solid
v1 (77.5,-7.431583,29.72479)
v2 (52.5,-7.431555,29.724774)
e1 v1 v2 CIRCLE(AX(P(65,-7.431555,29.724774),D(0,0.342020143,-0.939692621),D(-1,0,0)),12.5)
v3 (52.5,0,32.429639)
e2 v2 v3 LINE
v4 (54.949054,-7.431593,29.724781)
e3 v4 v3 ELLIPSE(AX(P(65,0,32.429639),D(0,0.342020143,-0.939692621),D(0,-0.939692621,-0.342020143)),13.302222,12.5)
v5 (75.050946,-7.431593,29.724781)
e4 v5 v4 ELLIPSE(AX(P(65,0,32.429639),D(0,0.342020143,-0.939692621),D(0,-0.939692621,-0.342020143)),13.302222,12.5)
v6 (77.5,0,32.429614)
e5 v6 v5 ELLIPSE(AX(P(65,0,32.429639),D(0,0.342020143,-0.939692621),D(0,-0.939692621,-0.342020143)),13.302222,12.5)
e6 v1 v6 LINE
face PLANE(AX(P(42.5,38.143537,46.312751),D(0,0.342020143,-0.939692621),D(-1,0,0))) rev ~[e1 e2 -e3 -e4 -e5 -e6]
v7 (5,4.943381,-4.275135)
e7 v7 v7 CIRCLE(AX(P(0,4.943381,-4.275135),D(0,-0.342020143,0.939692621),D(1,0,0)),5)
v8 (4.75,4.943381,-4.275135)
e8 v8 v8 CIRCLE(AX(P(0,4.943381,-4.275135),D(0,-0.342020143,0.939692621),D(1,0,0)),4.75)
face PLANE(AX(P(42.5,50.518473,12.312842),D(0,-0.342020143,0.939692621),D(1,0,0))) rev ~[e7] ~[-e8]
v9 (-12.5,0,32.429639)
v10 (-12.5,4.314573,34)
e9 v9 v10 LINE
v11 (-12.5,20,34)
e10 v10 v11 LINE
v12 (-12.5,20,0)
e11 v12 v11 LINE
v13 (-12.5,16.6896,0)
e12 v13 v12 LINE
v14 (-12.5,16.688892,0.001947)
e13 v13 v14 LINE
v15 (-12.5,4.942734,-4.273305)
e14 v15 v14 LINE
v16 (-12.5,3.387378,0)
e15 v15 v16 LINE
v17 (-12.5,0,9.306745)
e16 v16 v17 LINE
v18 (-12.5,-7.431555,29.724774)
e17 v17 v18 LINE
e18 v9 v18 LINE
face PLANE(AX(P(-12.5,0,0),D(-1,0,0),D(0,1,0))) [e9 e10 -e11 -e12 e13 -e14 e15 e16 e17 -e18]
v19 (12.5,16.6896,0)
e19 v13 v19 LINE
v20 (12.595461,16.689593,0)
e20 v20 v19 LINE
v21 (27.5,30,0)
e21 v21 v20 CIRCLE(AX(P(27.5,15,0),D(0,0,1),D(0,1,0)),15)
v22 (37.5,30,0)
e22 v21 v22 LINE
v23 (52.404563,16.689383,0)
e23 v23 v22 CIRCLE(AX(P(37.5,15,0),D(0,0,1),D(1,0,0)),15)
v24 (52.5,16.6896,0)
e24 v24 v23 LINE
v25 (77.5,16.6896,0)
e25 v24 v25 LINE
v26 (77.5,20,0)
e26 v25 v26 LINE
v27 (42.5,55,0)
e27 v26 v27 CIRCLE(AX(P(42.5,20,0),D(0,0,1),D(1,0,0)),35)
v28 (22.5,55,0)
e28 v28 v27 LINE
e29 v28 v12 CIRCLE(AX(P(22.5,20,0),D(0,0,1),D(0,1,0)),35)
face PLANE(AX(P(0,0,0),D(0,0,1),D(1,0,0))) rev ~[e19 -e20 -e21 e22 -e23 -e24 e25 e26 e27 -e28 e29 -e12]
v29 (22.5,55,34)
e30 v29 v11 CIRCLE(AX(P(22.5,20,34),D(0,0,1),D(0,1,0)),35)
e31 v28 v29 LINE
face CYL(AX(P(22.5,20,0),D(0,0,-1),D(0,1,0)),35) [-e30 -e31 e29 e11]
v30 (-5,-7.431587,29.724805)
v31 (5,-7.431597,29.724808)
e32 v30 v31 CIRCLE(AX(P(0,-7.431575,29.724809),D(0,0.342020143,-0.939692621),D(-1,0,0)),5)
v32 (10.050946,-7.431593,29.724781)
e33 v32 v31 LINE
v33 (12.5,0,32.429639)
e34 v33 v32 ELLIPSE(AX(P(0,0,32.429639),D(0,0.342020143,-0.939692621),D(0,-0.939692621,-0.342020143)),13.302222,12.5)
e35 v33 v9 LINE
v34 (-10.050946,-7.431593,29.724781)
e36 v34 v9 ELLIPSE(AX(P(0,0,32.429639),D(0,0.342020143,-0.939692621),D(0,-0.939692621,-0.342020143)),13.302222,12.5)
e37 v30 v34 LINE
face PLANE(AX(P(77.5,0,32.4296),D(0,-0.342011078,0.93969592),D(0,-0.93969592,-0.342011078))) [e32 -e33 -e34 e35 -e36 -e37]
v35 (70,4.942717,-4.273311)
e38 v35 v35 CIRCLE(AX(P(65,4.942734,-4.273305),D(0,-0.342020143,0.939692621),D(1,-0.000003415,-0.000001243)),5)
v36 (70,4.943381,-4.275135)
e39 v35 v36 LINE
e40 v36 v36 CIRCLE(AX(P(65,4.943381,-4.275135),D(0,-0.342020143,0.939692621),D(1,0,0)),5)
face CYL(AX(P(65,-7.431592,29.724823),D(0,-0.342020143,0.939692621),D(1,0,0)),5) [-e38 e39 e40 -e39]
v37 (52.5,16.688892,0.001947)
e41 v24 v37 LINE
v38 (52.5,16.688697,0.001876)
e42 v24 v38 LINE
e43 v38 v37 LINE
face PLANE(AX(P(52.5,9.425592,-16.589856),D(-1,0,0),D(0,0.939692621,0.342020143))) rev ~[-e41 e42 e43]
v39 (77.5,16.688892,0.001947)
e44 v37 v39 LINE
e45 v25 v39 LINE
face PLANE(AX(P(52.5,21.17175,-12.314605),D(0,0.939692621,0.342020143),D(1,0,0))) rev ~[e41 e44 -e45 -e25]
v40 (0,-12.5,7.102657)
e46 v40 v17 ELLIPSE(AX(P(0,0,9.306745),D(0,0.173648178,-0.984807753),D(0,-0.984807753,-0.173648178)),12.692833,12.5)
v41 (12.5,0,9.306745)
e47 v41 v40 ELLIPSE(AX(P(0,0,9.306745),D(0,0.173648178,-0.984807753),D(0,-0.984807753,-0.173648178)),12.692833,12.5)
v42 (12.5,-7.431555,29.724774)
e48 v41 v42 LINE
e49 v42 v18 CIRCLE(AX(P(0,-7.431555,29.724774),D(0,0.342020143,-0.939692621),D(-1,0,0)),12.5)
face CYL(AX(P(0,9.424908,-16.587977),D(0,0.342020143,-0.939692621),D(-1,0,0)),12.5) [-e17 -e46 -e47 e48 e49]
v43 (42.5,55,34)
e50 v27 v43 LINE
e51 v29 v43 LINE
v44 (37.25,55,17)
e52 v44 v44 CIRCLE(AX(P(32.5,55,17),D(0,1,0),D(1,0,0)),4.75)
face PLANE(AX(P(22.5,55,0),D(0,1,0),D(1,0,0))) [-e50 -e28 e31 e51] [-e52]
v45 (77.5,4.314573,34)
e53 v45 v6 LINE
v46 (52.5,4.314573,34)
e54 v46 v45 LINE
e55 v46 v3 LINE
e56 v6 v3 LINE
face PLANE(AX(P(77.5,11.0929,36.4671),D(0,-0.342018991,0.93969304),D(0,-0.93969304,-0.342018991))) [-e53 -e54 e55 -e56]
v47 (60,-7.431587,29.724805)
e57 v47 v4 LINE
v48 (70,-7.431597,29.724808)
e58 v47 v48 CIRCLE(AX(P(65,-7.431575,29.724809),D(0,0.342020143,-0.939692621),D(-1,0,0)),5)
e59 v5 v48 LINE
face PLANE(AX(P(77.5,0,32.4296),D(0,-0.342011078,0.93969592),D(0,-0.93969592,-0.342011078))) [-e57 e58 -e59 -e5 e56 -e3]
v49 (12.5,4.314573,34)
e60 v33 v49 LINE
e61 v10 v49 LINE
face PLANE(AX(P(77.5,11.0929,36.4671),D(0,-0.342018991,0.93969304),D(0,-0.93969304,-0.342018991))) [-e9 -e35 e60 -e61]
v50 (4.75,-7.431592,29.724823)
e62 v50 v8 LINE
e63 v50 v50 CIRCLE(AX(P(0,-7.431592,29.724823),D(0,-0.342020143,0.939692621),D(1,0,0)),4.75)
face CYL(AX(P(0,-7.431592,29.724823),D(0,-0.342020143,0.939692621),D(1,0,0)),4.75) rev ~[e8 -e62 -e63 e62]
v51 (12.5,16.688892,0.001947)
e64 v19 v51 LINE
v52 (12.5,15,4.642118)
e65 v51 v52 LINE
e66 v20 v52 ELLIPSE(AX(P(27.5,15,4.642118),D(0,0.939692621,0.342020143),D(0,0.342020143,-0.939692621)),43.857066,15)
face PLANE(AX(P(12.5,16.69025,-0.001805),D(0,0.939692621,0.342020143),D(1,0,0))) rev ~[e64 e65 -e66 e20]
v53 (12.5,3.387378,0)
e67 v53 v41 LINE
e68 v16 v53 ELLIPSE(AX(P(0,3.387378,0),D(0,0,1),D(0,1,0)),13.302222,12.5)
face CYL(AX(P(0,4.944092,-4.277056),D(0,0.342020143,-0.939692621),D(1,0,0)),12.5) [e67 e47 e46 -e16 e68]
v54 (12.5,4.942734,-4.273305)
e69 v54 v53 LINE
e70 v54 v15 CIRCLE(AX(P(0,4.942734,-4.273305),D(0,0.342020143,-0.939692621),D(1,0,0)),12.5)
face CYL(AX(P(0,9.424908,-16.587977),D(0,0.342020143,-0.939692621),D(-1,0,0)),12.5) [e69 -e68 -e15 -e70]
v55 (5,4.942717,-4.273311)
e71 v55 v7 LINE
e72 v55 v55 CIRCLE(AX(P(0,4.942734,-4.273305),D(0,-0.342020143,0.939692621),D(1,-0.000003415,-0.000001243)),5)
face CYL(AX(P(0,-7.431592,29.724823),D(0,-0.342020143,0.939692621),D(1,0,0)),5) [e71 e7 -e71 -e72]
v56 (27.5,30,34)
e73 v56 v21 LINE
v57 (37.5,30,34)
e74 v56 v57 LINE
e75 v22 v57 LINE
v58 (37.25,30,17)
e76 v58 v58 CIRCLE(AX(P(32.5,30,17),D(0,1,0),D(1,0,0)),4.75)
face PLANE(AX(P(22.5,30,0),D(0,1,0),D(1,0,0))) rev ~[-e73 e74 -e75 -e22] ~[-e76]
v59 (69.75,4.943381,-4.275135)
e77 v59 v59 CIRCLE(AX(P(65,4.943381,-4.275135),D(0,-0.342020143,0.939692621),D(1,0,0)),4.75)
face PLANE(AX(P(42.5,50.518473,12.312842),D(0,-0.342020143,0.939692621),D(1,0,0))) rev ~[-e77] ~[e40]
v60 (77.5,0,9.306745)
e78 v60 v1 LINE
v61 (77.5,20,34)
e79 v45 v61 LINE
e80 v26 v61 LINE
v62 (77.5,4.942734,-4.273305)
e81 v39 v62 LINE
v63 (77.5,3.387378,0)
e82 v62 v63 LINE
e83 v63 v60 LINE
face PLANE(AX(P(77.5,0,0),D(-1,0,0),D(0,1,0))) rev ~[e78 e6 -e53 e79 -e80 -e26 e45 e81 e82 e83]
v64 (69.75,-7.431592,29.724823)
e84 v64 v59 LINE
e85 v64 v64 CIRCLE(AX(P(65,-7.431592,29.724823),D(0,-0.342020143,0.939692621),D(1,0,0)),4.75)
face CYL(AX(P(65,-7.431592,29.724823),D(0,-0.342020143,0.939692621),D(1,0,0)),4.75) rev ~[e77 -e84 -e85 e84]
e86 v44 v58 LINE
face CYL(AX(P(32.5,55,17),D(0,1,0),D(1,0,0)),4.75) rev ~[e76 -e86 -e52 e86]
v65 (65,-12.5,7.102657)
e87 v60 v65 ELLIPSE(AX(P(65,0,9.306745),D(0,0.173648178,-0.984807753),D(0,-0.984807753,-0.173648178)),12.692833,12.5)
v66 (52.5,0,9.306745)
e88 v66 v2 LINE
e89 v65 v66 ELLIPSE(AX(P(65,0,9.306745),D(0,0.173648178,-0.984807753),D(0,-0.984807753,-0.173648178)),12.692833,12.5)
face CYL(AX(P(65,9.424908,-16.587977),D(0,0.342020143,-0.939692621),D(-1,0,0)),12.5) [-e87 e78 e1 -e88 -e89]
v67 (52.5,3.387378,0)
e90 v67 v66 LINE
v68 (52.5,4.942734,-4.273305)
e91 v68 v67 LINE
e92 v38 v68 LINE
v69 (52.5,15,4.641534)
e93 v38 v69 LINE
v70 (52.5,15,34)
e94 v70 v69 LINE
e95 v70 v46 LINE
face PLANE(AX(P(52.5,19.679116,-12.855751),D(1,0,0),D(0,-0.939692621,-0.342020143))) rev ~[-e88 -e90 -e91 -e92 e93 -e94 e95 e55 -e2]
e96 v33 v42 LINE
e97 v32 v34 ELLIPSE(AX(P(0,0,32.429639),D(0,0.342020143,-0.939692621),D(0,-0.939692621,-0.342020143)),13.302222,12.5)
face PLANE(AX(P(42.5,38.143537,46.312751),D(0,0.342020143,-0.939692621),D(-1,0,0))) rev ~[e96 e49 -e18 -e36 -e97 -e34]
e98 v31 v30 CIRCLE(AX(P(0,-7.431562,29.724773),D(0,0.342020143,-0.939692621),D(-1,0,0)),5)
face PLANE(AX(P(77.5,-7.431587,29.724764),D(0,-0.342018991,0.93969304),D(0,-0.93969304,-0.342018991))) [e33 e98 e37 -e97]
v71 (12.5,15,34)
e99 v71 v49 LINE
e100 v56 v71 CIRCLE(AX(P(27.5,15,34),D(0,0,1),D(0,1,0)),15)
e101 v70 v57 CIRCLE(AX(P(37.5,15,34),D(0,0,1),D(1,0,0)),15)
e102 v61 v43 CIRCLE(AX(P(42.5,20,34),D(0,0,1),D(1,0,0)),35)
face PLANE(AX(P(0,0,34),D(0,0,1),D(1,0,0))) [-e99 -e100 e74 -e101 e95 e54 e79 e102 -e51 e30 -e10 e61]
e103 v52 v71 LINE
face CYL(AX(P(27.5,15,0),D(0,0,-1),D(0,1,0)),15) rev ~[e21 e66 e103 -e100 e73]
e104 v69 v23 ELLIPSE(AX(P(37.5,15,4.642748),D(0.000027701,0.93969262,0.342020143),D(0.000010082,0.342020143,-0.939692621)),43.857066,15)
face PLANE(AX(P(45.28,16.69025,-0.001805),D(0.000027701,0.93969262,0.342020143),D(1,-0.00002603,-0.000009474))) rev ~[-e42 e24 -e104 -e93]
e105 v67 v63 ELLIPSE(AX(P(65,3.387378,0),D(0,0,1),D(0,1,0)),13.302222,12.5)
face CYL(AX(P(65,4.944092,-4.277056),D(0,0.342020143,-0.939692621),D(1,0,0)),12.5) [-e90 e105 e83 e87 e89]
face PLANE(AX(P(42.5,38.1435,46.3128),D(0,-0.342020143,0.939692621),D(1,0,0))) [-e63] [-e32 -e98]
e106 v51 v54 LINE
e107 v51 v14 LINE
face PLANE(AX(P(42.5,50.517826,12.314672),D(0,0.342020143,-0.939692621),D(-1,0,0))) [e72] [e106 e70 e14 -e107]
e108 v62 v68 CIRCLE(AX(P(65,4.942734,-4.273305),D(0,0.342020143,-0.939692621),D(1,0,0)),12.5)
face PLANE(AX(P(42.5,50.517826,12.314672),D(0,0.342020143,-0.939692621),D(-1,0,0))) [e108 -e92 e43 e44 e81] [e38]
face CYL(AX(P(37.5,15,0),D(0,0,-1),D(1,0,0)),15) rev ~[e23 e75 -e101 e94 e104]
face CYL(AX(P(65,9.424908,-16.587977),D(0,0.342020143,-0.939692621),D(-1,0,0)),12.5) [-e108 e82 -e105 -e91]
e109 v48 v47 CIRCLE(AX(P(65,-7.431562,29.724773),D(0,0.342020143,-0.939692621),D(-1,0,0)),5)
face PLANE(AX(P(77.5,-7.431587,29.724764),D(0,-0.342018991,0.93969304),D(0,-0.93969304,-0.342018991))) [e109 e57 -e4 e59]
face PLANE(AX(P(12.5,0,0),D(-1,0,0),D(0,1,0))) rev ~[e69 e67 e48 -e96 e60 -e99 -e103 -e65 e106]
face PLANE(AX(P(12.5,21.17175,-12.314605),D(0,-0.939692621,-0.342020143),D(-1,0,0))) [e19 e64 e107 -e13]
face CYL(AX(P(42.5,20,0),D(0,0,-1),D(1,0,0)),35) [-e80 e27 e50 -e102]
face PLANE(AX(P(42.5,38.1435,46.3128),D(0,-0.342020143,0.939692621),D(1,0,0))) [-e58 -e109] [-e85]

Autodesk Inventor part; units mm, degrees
ref_plane "YZ Plane" through (0, 0, 0) normal (1, 0, 0) x (0, 1, 0)
ref_plane "XZ Plane" through (0, 0, 0) normal (0, 1, 0) x (-1, 0, 0)
sketch "Sketch1" plane through (0, 0, 0) normal (0, 0, 1) x (1, 0, 0)
  circle A0 centre (0, 0) radius 5
  circle A1 centre (65, 0) radius 5
  circle A2 centre (0, 0) radius 12.5
  circle A3 centre (65, 0) radius 12.5
  line L0 (22.5, 9.5) -> (42.5, 9.5)
  line L1 (42.5, 9.5) -> (42.5, -10.5)
  line L2 (42.5, -10.5) -> (22.5, -10.5)
  line L3 (22.5, -10.5) -> (22.5, 9.5)
  line L4 (0, 0) -> (65, 0) construction
  line L5 (32.5, 0) -> (32.5, 30) construction
  line L6 (27.5, 30) -> (37.5, 30)
  line L7 (12.5, 0) -> (12.5, 15)
  line L8 (52.5, 0) -> (52.5, 15)
  arc A4 (27.5, 30) -> (12.5, 15) centre (27.5, 15) ccw
  arc A5 (52.5, 15) -> (37.5, 30) centre (37.5, 15) ccw
  line L9 (-12.5, 0) -> (-12.5, 20)
  line L10 (77.5, 0) -> (77.5, 20)
  line L11 (22.5, 55) -> (42.5, 55)
  arc A6 (22.5, 55) -> (-12.5, 20) centre (22.5, 20) ccw
  arc A7 (77.5, 20) -> (42.5, 55) centre (42.5, 20) ccw
  point P0 (22.5, 30)
  point P1 (42.5, 30)
  dimension "d0" = 10
  dimension "d1" = 10
  dimension "d2" = 65
  dimension "d3" = 25
  dimension "d4" = 25
  dimension "d5" = 22.5
  dimension "d6" = 22.5
  dimension "d7" = 9.5
  dimension "d8" = 10.5
  dimension "d11" = 20
  dimension "d12" = 10
  dimension "d13" = 30
  dimension "d14" = 15
  dimension "d15" = 55
  dimension "d16" = 35
extrude "Extrusion1" add sketch "Sketch1" along normal blind 34 contours A0 | A1 | A2 | A2 L9 A6 L11 A7 L10 A3 L8 A5 L6 A4 L7 | A3
ref_plane "Work Plane4" through (42.5, 55, 0) normal (0, 0.3420201, -0.9396926) x (-1, 0, 0)
sketch "Sketch23" plane through (42.5, 55, 0) normal (0, 0.3420201, -0.9396926) x (-1, 0, 0)
  ellipse E0 centre (42.5, -40.0544) end of major axis (30, -40.0544) minor radius 11.7462 (30, -40.0544) -> (55, -40.0544) ccw projected
  line L0 (30, -40.0544) -> (30, -25.959) projected
  ellipse E1 centre (15, -25.959) end of major axis (30, -25.959) minor radius 14.0954 (30, -25.959) -> (15, -11.8636) ccw projected
  line L1 (15, -11.8636) -> (5, -11.8636) projected
  ellipse E2 centre (5, -25.959) end of major axis (20, -25.959) minor radius 14.0954 (5, -11.8636) -> (-10, -25.959) ccw projected
  line L2 (-10, -25.959) -> (-10, -40.0544) projected
  ellipse E3 centre (-22.5, -40.0544) end of major axis (-35, -40.0544) minor radius 11.7462 (-35, -40.0544) -> (-10, -40.0544) ccw projected
  line L3 (-35, -40.0544) -> (-35, -21.2606) projected
  ellipse E4 centre (0, -21.2606) end of major axis (-35, -21.2606) minor radius 32.8892 (0, 11.6287) -> (-35, -21.2606) ccw projected
  line L4 (0, 11.6287) -> (20, 11.6287) projected
  ellipse E5 centre (20, -21.2606) end of major axis (55, -21.2606) minor radius 32.8892 (55, -21.2606) -> (20, 11.6287) ccw projected
  line L5 (55, -21.2606) -> (55, -40.0544) projected
  ellipse E6 centre (42.5, -51.6831) end of major axis (30, -51.6831) minor radius 11.7462 (30, -51.6831) -> (55, -51.6831) ccw projected
  line L6 (55, -32.8892) -> (55, -51.6831) projected
  ellipse E7 centre (20, -32.8892) end of major axis (55, -32.8892) minor radius 32.8892 (55, -32.8892) -> (20, 0) ccw projected
  line L7 (0, 0) -> (20, 0) projected
  ellipse E8 centre (0, -32.8892) end of major axis (-35, -32.8892) minor radius 32.8892 (0, 0) -> (-35, -32.8892) ccw projected
  line L8 (-35, -51.6831) -> (-35, -32.8892) projected
  ellipse E9 centre (-22.5, -51.6831) end of major axis (-35, -51.6831) minor radius 11.7462 (-35, -51.6831) -> (-10, -51.6831) ccw projected
  line L9 (-10, -37.5877) -> (-10, -51.6831) projected
  ellipse E10 centre (5, -37.5877) end of major axis (20, -37.5877) minor radius 14.0954 (5, -23.4923) -> (-10, -37.5877) ccw projected
  line L10 (15, -23.4923) -> (5, -23.4923) projected
  ellipse E11 centre (15, -37.5877) end of major axis (30, -37.5877) minor radius 14.0954 (30, -37.5877) -> (15, -23.4923) ccw projected
  line L11 (30, -51.6831) -> (30, -37.5877) projected
  line L12 (0, 0) -> (20, 0) projected
  line L13 (10, 0) -> (10, -36)
  circle A0 centre (-22.5, -48.5) radius 5
  circle A1 centre (42.5, -48.5) radius 5
  circle A2 centre (-22.5, -48.5) radius 12.5
  circle A3 centre (42.5, -48.5) radius 12.5
  line L14 (-35, -36) -> (-10, -36)
  line L15 (-35, -36) -> (-35, -48.5)
  line L16 (-35, -51.6831) -> (-35, -40.0544) projected
  line L17 (-10, -36) -> (-10, -48.5)
  line L18 (-10, -51.6831) -> (-10, -40.0544) projected
  line L19 (30, -36) -> (55, -36)
  line L20 (30, -51.6831) -> (30, -40.0544) projected
  line L21 (30, -48.5) -> (30, -36)
  line L22 (55, -48.5) -> (55, -36)
  dimension "d108" = 36
  dimension "d110" = 10
  dimension "d111" = 10
  dimension "d112" = 12.5
  dimension "d113" = 12.5
  dimension "d114" = 25
  dimension "d115" = 25
extrude "Extrusion29" add sketch "Sketch23" against normal blind 49.285 contours L0 L19 A3 E0 | E0 A3 L11 | A3 E0 A1 | E0 A1 A3 | L19 L5 E0 A3 | A3 E0 L6 | L2 E3 A2 L14 | L9 A2 E3 | A2 E3 A0 | A2 E3 L3 L14 | A2 E3 A0 | A2 L8 E3
sketch "Sketch24" plane through (42.5, 55, 0) normal (0, 0.3420201, -0.9396926) x (-1, 0, 0)
  circle A0 centre (-22.5, -48.5) radius 5 projected
  arc A1 (-35, -48.5) -> (-10, -48.5) centre (-22.5, -48.5) ccw projected
  line L0 (-10, -48.5) -> (-10, -36) projected
  line L1 (-10, -36) -> (-35, -36) projected
  line L2 (-35, -36) -> (-35, -48.5) projected
  circle A2 centre (42.5, -48.5) radius 5 projected
  arc A3 (30, -48.5) -> (55, -48.5) centre (42.5, -48.5) ccw projected
  line L3 (55, -48.5) -> (55, -36) projected
  line L4 (30, -36) -> (55, -36) projected
  line L5 (30, -36) -> (30, -48.5) projected
  point P0 (42.5, -51.6831)
extrude "Extrusion30" cut sketch "Sketch24" against normal blind 13.103
sketch "Sketch25" plane through (77.5, 20, 34) normal (1, 0, 0) x (0, 0, -1)
  line L0 (1.5704, -20) -> (1.5704, -20) projected
  line L1 (1.5704, -20) -> (4.2752, -27.4316) projected
  line L2 (4.2752, -27.4316) -> (4.2752, -27.4316) projected
  line L3 (4.2752, -27.4316) -> (1.5704, -20) projected
  line L4 (-2.4671, -8.9071) -> (10.0523, -43.304)
  line L5 (10.0523, -43.304) -> (-2.0937, -47.7247)
  line L6 (-2.4671, -8.9071) -> (-14.6131, -13.3279)
  line L7 (-2.0937, -47.7247) -> (-14.6131, -13.3279)
  point P0 (34, -20)
extrude "Extrusion31" cut sketch "Sketch25" against normal blind 100
sketch "Sketch26" plane through (42.5, 50.5185, 12.3128) normal (0, 0.3420201, -0.9396926) x (-1, 0, 0)
  circle A0 centre (-22.5, -48.5) radius 5 projected
  arc A1 (-35, -48.5) -> (-10, -48.5) centre (-22.5, -48.5) ccw projected
  line L0 (-10, -36.0002) -> (-10, -48.5) projected
  line L1 (-10, -36) -> (-10, -36.0002) projected
  line L2 (-35, -36) -> (-10, -36) projected
  line L3 (-35, -48.5) -> (-35, -36) projected
  circle A2 centre (42.5, -48.5) radius 5 projected
  arc A3 (30, -48.5) -> (55, -48.5) centre (42.5, -48.5) ccw projected
  line L4 (55, -36) -> (55, -48.5) projected
  line L5 (30, -36) -> (55, -36) projected
  line L6 (30, -36.0002) -> (30, -36) projected
  line L7 (30, -48.5) -> (30, -36.0002) projected
  line L8 (-35, -36) -> (-43.7615, -36)
  line L9 (-43.7615, -36) -> (-43.7615, -67.4165)
  line L10 (-43.7615, -67.4165) -> (-2.78, -67.4165)
  line L11 (-2.78, -67.4165) -> (-2.78, -36)
  line L12 (-2.78, -36) -> (-10, -36)
  line L13 (30, -36.0002) -> (23.7348, -36)
  line L14 (23.7348, -36) -> (23.7338, -67.4165)
  line L15 (23.7338, -67.4165) -> (61.4136, -67.4165)
  line L16 (61.4136, -67.4165) -> (61.4136, -36.0012)
  line L17 (61.4136, -36.0012) -> (55, -36)
  point P0 (42.5, -51.6831)
extrude "Extrusion32" cut sketch "Sketch26" against normal blind 100 contours A0 | A1 L0 L12 L11 L10 L9 L8 L3 | A2 | A3 L4 L17 L16 L15 L14 L13 L7
sketch "Sketch27" plane through (22.5, 55, 0) normal (0, 1, 0) x (1, 0, 0)
  circle A0 centre (10, -17) radius 5
  line L0 (20, 0) -> (0, 0) projected
  line L1 (0, 0) -> (0, -34) projected
  line L2 (20, -34) -> (0, -34) projected
  line L3 (20, 0) -> (20, -34) projected
  point P0 (-22.5, 0)
  dimension "d124" = 10
  dimension "d125" = 20
  dimension "d126" = 34
  dimension "d127" = 10
  dimension "d128" = 17
extrude "Extrusion33" cut sketch "Sketch27" against normal blind 100 contours A0
sketch "Sketch28" plane through (42.5, 38.1435, 46.3128) normal (0, -0.3420201, 0.9396926) x (1, 0, 0)
  circle A0 centre (-42.5, -48.5) radius 5 projected
  line L0 (-55, -48.5) -> (-55, -36) projected
  arc A1 (-55, -48.5) -> (-30, -48.5) centre (-42.5, -48.5) ccw projected
  line L1 (-30, -36) -> (-30, -48.5) projected
  line L2 (-55, -36) -> (-30, -36) projected
  circle A2 centre (22.5, -48.5) radius 5 projected
  line L3 (35, -36) -> (35, -48.5) projected
  line L4 (35, -36) -> (10, -36) projected
  line L5 (10, -48.5) -> (10, -36) projected
  arc A3 (10, -48.5) -> (35, -48.5) centre (22.5, -48.5) ccw projected
  circle A4 centre (22.5, -48.5) radius 4.75
  circle A5 centre (22.5, -48.5) radius 5
  circle A6 centre (-42.5, -48.5) radius 5
  circle A7 centre (-42.5, -48.5) radius 4.75
  point P0 (-42.5, -51.6831)
  dimension "d131" = 9.5
  dimension "d132" = 9.5
extrude "Extrusion34" add sketch "Sketch28" against normal up to surface (36.182 mm away) contours A0 | A2
sketch "Sketch29" plane through (22.5, 55, 0) normal (0, 1, 0) x (1, 0, 0)
  circle A0 centre (10, -17) radius 5 projected
  line L0 (20, 0) -> (0, 0) projected
  line L1 (0, 0) -> (0, -34) projected
  line L2 (20, -34) -> (0, -34) projected
  line L3 (20, 0) -> (20, -34) projected
  circle A1 centre (10, -17) radius 4.75
  point P0 (-22.5, 0)
  dimension "d135" = 9.5
extrude "Extrusion35" add sketch "Sketch29" against normal up to surface (25 mm away) contours A0
equation "\"d12\" = 0.5 * d11"
equation "\"d15\" = d13 + d3"
properties part number "MountB"
